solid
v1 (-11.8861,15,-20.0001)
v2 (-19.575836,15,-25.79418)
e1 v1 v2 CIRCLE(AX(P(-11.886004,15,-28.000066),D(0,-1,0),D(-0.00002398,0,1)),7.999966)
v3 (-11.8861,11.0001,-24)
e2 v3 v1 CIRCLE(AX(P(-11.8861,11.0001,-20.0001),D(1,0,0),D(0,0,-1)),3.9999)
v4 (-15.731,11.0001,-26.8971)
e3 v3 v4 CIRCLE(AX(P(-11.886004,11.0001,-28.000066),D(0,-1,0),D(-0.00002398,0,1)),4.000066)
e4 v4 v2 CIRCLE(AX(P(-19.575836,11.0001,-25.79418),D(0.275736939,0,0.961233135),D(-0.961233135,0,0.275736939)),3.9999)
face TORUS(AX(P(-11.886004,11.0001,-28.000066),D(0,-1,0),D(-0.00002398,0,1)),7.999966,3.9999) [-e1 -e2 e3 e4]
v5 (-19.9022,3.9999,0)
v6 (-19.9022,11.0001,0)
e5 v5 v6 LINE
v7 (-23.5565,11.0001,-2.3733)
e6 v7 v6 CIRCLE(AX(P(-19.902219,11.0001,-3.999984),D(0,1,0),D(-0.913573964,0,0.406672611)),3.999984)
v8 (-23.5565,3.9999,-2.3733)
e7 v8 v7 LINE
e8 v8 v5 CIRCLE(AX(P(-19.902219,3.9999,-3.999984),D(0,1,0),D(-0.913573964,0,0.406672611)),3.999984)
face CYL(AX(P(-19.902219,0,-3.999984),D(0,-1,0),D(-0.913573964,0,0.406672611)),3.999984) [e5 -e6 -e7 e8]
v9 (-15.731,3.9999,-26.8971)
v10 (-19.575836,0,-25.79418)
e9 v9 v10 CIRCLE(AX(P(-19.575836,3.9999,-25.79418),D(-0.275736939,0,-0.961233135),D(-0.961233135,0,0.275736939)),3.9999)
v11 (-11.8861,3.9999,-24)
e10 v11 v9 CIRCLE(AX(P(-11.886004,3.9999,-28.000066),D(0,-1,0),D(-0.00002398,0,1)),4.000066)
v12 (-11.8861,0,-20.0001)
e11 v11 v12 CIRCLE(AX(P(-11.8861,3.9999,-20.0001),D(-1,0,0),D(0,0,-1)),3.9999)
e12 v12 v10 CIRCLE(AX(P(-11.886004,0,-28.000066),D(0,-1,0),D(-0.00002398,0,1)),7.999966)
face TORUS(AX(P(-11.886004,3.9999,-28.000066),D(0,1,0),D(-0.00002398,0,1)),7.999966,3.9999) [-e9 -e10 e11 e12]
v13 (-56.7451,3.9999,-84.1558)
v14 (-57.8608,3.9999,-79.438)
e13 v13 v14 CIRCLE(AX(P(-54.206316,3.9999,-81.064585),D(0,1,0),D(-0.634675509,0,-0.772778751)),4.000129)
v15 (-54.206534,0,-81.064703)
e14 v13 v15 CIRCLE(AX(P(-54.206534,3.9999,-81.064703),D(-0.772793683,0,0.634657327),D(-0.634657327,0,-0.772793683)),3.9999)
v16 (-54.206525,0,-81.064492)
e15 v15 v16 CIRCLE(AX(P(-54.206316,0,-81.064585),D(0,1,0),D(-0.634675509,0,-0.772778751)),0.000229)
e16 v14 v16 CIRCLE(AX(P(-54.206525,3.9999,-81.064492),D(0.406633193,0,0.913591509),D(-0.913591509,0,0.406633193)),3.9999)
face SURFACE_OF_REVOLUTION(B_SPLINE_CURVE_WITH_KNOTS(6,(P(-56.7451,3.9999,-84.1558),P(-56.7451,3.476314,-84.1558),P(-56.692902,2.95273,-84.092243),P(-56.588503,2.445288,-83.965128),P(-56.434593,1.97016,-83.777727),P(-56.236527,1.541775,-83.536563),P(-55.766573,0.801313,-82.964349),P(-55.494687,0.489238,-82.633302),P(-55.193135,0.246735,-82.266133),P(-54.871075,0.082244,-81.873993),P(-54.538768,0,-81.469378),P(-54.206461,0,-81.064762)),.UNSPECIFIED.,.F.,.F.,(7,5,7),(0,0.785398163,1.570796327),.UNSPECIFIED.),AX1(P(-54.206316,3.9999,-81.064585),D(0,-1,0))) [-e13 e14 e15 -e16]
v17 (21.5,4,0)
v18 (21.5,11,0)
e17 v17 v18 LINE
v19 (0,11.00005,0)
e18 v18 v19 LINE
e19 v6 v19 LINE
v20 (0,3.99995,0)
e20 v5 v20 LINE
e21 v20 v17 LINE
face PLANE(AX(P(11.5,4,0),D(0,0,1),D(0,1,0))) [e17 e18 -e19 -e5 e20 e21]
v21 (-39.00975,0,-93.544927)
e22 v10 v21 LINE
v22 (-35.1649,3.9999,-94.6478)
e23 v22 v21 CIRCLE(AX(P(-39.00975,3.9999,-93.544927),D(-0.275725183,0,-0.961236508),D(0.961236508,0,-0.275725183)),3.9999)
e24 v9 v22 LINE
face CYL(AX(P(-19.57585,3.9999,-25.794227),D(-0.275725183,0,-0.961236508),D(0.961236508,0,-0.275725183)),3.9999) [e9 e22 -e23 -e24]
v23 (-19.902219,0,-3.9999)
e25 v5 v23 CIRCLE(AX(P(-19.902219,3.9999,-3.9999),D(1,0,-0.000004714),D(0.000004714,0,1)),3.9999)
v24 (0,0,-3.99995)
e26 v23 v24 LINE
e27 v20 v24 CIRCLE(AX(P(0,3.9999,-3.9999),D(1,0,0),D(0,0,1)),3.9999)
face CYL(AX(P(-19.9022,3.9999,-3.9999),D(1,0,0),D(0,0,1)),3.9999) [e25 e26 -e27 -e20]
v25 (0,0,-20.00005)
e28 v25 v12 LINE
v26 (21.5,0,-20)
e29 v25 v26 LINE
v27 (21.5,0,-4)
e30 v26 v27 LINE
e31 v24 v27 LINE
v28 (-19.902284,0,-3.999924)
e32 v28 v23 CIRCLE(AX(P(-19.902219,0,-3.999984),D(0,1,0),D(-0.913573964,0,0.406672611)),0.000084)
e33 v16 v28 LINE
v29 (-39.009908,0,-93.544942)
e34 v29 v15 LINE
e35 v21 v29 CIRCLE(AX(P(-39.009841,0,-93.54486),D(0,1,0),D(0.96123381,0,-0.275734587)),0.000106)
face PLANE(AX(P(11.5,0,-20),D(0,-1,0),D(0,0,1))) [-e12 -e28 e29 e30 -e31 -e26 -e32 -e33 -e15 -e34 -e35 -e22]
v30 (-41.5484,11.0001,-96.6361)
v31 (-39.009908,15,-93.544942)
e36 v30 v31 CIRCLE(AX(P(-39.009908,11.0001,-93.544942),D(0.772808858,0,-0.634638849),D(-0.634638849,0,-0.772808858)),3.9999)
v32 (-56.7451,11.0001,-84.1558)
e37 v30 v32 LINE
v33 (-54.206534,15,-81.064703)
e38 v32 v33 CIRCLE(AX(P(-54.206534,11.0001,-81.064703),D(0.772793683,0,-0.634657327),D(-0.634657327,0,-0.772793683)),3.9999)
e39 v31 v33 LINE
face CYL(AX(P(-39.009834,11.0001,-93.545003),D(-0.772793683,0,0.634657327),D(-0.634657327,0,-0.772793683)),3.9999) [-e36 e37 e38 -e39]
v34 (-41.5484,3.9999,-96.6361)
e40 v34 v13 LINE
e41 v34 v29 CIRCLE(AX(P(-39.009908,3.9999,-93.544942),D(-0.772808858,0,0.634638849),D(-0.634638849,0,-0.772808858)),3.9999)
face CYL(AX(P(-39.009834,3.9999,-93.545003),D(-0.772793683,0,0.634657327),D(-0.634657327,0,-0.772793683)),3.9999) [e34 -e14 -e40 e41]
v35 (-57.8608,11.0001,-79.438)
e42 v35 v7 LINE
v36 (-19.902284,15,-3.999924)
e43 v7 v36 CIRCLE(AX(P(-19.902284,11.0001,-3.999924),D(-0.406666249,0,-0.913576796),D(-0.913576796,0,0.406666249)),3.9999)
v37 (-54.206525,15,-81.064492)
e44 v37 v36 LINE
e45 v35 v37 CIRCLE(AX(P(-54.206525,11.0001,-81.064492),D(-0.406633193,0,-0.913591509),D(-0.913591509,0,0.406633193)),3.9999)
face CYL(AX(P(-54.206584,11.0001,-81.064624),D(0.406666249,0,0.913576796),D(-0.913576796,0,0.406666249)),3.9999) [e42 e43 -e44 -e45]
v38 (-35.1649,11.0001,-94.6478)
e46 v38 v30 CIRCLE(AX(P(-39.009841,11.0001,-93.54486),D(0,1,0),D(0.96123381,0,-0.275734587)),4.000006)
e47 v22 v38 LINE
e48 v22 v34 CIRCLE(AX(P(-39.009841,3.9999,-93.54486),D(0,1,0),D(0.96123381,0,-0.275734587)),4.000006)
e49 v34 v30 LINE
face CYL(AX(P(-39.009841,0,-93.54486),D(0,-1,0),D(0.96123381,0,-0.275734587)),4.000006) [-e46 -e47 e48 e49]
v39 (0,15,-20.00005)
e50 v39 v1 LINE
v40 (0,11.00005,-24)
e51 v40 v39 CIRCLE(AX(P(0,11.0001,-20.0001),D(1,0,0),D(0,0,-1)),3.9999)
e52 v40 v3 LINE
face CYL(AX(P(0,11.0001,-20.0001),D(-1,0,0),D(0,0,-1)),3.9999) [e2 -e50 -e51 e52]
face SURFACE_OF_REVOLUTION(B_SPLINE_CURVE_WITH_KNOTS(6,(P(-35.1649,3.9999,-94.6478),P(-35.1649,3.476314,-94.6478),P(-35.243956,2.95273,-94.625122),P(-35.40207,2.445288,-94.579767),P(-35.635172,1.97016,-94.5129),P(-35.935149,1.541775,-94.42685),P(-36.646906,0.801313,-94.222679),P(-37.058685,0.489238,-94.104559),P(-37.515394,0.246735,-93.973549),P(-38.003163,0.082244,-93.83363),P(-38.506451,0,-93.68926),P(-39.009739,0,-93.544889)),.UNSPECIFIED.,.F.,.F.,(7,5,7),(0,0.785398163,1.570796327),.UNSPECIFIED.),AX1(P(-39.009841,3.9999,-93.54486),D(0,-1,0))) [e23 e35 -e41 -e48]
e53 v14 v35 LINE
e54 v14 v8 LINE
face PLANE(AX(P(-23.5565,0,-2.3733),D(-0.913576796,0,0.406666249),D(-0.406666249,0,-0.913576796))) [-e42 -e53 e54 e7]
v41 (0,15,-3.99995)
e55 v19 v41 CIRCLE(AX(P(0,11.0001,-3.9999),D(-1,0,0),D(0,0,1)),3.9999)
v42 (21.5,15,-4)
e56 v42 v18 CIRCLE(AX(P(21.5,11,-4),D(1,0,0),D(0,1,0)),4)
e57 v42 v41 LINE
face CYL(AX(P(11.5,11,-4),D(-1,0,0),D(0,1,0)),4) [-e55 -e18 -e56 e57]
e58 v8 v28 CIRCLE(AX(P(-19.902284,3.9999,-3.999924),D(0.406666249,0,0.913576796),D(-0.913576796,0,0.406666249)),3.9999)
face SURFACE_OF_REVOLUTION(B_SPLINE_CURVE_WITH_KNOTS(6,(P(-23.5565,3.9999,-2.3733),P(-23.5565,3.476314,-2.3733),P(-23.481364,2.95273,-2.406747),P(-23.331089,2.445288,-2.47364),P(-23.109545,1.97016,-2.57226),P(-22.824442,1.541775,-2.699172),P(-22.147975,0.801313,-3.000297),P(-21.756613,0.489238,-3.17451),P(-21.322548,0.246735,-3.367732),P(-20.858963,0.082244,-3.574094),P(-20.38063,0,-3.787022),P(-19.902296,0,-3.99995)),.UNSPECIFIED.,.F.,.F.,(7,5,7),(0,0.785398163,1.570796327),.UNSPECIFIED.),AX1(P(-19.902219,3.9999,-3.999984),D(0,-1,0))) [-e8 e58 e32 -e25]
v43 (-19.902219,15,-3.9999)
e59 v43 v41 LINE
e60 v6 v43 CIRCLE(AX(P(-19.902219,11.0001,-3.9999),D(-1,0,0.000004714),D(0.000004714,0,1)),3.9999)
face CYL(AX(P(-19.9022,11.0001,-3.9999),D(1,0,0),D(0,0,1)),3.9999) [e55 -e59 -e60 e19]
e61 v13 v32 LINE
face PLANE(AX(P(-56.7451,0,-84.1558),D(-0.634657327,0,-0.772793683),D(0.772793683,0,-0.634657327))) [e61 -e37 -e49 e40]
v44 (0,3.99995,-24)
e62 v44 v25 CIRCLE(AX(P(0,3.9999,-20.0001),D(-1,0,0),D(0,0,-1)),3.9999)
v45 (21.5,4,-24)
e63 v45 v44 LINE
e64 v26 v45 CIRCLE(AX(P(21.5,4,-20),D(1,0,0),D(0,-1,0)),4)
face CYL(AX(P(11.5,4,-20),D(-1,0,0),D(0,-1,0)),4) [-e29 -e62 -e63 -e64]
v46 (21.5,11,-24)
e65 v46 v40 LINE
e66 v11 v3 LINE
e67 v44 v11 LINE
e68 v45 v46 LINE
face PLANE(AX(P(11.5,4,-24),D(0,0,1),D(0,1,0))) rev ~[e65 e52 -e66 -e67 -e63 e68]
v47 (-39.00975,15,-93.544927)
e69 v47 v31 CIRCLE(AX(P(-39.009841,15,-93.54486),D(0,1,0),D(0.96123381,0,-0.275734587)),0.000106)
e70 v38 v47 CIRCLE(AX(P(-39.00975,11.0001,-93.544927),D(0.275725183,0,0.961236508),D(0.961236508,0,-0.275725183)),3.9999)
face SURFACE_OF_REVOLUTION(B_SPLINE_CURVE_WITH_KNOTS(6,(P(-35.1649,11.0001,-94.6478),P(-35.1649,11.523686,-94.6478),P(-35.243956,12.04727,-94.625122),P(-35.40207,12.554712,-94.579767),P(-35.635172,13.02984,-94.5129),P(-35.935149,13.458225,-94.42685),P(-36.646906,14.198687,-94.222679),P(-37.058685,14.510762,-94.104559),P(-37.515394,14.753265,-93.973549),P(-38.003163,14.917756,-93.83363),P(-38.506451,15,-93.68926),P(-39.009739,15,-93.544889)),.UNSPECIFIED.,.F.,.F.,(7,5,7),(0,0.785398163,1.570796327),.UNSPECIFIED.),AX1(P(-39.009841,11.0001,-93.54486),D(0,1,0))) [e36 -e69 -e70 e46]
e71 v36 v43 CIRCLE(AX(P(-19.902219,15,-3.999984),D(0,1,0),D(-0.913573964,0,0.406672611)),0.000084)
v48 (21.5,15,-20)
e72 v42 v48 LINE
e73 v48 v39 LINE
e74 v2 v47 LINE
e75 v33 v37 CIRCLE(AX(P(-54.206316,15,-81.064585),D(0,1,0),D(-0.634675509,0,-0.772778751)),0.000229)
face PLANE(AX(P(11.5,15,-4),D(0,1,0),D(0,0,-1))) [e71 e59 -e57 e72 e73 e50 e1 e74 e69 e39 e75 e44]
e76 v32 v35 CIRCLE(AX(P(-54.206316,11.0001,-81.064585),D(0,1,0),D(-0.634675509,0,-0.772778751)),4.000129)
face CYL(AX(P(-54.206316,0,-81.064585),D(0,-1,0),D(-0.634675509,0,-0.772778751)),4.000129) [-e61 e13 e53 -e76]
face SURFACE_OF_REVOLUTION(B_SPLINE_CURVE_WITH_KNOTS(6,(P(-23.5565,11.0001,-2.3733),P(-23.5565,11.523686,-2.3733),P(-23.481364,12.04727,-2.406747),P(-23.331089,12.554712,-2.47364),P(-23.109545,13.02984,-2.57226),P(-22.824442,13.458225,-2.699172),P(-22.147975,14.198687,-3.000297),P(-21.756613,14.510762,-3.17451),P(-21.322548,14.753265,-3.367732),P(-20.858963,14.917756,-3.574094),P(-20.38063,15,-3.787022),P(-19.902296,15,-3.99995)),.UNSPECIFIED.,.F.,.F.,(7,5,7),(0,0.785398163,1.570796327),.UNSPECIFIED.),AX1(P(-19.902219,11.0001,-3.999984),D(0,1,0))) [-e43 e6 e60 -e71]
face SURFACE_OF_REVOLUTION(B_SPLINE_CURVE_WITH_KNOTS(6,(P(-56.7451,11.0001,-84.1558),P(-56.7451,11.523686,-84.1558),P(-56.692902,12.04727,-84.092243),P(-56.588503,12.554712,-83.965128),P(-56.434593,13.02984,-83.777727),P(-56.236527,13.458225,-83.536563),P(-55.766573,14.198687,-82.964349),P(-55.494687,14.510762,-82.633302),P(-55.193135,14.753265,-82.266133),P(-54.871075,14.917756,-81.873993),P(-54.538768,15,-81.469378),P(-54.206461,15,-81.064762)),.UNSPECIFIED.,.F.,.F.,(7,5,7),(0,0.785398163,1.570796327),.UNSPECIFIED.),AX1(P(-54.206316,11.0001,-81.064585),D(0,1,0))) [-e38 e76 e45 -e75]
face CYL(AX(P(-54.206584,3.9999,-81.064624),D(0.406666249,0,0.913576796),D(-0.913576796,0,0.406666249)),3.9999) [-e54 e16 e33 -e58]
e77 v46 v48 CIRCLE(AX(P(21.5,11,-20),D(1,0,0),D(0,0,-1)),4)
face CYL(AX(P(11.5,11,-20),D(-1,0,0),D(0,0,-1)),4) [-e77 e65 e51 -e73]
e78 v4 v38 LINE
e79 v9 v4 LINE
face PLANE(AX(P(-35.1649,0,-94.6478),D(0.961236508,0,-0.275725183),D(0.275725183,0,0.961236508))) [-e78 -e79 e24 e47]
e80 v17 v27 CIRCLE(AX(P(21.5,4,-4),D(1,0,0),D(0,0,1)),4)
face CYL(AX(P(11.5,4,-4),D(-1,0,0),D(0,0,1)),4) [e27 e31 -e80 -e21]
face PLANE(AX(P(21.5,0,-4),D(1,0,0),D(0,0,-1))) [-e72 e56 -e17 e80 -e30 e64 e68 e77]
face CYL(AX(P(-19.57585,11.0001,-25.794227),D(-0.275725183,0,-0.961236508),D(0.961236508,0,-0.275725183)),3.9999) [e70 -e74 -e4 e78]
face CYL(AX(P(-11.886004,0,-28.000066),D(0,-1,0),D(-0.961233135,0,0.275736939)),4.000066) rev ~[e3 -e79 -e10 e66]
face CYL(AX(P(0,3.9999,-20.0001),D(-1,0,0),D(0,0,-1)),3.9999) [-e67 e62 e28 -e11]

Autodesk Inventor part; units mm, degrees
ref_plane "YZ Plane" through (0, 0, 0) normal (1, 0, 0) x (0, 1, 0)
ref_plane "XZ Plane" through (0, 0, 0) normal (0, 1, 0) x (-1, 0, 0)
ref_plane "XY Plane" through (0, 0, 0) normal (0, 0, 1) x (1, 0, 0)
sketch "Sketch4" plane through (0, 0, 0) normal (0, 1, 0) x (-1, 0, 0)
  line L0 (23.5565, -2.3733) -> (57.8608, -79.438)
  line L1 (0, 0) -> (0, -24)
  line L2 (0, -24) -> (11.8861, -24)
  line L3 (56.7451, -84.1558) -> (41.5484, -96.6361)
  line L4 (35.1649, -94.6478) -> (15.731, -26.8971)
  line L5 (19.9022, 0) -> (0, 0)
  arc A0 (15.731, -26.8971) -> (11.8861, -24) centre (11.8861, -28) ccw
  arc A1 (23.5565, -2.3733) -> (19.9022, 0) centre (19.9022, -4) ccw
  arc A2 (56.7451, -84.1558) -> (57.8608, -79.438) centre (54.2065, -81.0647) ccw
  arc A3 (35.1649, -94.6478) -> (41.5484, -96.6361) centre (39.0098, -93.5449) ccw
  point P0 (22.5, 0)
  point P1 (59.1, -82.2219)
  point P2 (36.8435, -100.5)
  dimension "d40" = 22.5
  dimension "d41" = 90
  dimension "d43" = 24
  dimension "d44" = 28.8
  dimension "d45" = 4
extrude "Extrusion3" add sketch "Sketch4" along normal blind 15
fillet "Fillet3" radius 4 18 edges at (-37.8203, 15, -97.364) (-49.1468, 15, -90.396) (-58.0991, 15, -81.9852) (-40.7086, 15, -40.9057) (-22.0808, 15, -0.6454) (-9.9511, 15, 0) (-14.2932, 15, -24.8053) (-5.943, 15, -24) (-25.4479, 15, -60.7725) (-37.8203, 0, -97.364) (-49.1468, 0, -90.396) (-58.0991, 0, -81.9852) (-40.7086, 0, -40.9057) (-22.0808, 0, -0.6454) (-9.9511, 0, 0) (-14.2932, 0, -24.8053) (-5.943, 0, -24) (-25.4479, 0, -60.7725)
sketch "Sketch5" plane through (0, 0, -4) normal (1, 0, 0) x (0, 0, -1)
  line L0 (-4, 4) -> (-4, 11) projected
  line L1 (-4, 7.5) -> (1.9, 7.5)
  point P0 (-4, 0)
  dimension "d49" = 5.9
sketch "Sketch6" plane through (0, 0, -4) normal (1, 0, 0) x (0, 0, -1)
  line L0 (0, 0) -> (16, 0) projected
  line L1 (20, 4) -> (20, 11) projected
  arc A0 (16, 0) -> (20, 4) centre (16, 4) ccw
  arc A1 (-4, 4) -> (0, 0) centre (0, 4) ccw projected
  arc A2 (0, 15) -> (-4, 11) centre (0, 11) ccw projected
  arc A3 (0, 15) -> (0, 15) centre (0, 11) ccw
  arc A4 (20, 11) -> (16, 15) centre (16, 11) ccw projected
  line L2 (16, 15) -> (0, 15)
  line L3 (-4, 4) -> (-4, 11) projected
  line L4 (-4, 11) -> (-4, 4)
  arc A5 (0, 15) -> (-4, 11) centre (0, 11) ccw projected
  point P0 (-4, 0)
extrude "Extrusion4" add sketch "Sketch6" along normal blind 11.5
sketch "Sketch7" plane through (11.5, 0, -4) normal (1, 0, 0) x (0, 0, -1)
  point P0 (-4, 0)
sketch "Sketch8" plane through (11.5, 0, -4) normal (1, 0, 0) x (0, 0, -1)
  line L0 (-4, 4) -> (-4, 11) projected
  arc A0 (16, 0) -> (20, 4) centre (16, 4) ccw projected
  line L1 (20, 4) -> (20, 11) projected
  line L2 (20, 4) -> (20, 11)
  line L3 (77.0647, 0) -> (0, 0) projected
  arc A1 (-4, 4) -> (0, 0) centre (0, 4) ccw projected
  line L4 (16, 0) -> (0, 0)
  arc A2 (20, 11) -> (16, 15) centre (16, 11) ccw projected
  line L5 (0, 15) -> (77.0647, 15) projected
  line L6 (16, 15) -> (0, 15)
  arc A3 (20, 11) -> (16, 15) centre (16, 11) ccw
  arc A4 (16, 0.4098) -> (20, 4) centre (16.6189, 3.7436) ccw
  arc A5 (-4, 4) -> (0, 0) centre (0, 4) ccw
  ellipse E0 centre (0, 11) end of major axis (0, 15) minor radius 1.6267 (0, 15) -> (-1.6267, 11) ccw projected
  arc A6 (0, 15) -> (-4, 11) centre (0, 11) ccw
  point P0 (-4, 0)
extrude "Extrusion5" add sketch "Sketch8" along normal blind 10 contours L0 A6 L5 A2 L1 A0 L3 A1
sketch "Sketch9" plane through (21.5, 0, -4) normal (1, 0, 0) x (0, 0, -1)
  line L0 (-4, 4) -> (-4, 11) projected
  line L1 (-4, 7.5) -> (1.9, 7.5)
  point P0 (-4, 0)
  dimension "d56" = 5.9
sketch "Sketch10" plane through (21.5, 0, -4) normal (1, 0, 0) x (0, 0, -1)
  line L0 (-4, 4) -> (-4, 11) projected
  line L1 (-4, 7.5) -> (1.9, 7.5)
  point P0 (-4, 0)
  dimension "d57" = 5.9
properties part number "Handle Gearbox handle" material "ABS Plastic"
